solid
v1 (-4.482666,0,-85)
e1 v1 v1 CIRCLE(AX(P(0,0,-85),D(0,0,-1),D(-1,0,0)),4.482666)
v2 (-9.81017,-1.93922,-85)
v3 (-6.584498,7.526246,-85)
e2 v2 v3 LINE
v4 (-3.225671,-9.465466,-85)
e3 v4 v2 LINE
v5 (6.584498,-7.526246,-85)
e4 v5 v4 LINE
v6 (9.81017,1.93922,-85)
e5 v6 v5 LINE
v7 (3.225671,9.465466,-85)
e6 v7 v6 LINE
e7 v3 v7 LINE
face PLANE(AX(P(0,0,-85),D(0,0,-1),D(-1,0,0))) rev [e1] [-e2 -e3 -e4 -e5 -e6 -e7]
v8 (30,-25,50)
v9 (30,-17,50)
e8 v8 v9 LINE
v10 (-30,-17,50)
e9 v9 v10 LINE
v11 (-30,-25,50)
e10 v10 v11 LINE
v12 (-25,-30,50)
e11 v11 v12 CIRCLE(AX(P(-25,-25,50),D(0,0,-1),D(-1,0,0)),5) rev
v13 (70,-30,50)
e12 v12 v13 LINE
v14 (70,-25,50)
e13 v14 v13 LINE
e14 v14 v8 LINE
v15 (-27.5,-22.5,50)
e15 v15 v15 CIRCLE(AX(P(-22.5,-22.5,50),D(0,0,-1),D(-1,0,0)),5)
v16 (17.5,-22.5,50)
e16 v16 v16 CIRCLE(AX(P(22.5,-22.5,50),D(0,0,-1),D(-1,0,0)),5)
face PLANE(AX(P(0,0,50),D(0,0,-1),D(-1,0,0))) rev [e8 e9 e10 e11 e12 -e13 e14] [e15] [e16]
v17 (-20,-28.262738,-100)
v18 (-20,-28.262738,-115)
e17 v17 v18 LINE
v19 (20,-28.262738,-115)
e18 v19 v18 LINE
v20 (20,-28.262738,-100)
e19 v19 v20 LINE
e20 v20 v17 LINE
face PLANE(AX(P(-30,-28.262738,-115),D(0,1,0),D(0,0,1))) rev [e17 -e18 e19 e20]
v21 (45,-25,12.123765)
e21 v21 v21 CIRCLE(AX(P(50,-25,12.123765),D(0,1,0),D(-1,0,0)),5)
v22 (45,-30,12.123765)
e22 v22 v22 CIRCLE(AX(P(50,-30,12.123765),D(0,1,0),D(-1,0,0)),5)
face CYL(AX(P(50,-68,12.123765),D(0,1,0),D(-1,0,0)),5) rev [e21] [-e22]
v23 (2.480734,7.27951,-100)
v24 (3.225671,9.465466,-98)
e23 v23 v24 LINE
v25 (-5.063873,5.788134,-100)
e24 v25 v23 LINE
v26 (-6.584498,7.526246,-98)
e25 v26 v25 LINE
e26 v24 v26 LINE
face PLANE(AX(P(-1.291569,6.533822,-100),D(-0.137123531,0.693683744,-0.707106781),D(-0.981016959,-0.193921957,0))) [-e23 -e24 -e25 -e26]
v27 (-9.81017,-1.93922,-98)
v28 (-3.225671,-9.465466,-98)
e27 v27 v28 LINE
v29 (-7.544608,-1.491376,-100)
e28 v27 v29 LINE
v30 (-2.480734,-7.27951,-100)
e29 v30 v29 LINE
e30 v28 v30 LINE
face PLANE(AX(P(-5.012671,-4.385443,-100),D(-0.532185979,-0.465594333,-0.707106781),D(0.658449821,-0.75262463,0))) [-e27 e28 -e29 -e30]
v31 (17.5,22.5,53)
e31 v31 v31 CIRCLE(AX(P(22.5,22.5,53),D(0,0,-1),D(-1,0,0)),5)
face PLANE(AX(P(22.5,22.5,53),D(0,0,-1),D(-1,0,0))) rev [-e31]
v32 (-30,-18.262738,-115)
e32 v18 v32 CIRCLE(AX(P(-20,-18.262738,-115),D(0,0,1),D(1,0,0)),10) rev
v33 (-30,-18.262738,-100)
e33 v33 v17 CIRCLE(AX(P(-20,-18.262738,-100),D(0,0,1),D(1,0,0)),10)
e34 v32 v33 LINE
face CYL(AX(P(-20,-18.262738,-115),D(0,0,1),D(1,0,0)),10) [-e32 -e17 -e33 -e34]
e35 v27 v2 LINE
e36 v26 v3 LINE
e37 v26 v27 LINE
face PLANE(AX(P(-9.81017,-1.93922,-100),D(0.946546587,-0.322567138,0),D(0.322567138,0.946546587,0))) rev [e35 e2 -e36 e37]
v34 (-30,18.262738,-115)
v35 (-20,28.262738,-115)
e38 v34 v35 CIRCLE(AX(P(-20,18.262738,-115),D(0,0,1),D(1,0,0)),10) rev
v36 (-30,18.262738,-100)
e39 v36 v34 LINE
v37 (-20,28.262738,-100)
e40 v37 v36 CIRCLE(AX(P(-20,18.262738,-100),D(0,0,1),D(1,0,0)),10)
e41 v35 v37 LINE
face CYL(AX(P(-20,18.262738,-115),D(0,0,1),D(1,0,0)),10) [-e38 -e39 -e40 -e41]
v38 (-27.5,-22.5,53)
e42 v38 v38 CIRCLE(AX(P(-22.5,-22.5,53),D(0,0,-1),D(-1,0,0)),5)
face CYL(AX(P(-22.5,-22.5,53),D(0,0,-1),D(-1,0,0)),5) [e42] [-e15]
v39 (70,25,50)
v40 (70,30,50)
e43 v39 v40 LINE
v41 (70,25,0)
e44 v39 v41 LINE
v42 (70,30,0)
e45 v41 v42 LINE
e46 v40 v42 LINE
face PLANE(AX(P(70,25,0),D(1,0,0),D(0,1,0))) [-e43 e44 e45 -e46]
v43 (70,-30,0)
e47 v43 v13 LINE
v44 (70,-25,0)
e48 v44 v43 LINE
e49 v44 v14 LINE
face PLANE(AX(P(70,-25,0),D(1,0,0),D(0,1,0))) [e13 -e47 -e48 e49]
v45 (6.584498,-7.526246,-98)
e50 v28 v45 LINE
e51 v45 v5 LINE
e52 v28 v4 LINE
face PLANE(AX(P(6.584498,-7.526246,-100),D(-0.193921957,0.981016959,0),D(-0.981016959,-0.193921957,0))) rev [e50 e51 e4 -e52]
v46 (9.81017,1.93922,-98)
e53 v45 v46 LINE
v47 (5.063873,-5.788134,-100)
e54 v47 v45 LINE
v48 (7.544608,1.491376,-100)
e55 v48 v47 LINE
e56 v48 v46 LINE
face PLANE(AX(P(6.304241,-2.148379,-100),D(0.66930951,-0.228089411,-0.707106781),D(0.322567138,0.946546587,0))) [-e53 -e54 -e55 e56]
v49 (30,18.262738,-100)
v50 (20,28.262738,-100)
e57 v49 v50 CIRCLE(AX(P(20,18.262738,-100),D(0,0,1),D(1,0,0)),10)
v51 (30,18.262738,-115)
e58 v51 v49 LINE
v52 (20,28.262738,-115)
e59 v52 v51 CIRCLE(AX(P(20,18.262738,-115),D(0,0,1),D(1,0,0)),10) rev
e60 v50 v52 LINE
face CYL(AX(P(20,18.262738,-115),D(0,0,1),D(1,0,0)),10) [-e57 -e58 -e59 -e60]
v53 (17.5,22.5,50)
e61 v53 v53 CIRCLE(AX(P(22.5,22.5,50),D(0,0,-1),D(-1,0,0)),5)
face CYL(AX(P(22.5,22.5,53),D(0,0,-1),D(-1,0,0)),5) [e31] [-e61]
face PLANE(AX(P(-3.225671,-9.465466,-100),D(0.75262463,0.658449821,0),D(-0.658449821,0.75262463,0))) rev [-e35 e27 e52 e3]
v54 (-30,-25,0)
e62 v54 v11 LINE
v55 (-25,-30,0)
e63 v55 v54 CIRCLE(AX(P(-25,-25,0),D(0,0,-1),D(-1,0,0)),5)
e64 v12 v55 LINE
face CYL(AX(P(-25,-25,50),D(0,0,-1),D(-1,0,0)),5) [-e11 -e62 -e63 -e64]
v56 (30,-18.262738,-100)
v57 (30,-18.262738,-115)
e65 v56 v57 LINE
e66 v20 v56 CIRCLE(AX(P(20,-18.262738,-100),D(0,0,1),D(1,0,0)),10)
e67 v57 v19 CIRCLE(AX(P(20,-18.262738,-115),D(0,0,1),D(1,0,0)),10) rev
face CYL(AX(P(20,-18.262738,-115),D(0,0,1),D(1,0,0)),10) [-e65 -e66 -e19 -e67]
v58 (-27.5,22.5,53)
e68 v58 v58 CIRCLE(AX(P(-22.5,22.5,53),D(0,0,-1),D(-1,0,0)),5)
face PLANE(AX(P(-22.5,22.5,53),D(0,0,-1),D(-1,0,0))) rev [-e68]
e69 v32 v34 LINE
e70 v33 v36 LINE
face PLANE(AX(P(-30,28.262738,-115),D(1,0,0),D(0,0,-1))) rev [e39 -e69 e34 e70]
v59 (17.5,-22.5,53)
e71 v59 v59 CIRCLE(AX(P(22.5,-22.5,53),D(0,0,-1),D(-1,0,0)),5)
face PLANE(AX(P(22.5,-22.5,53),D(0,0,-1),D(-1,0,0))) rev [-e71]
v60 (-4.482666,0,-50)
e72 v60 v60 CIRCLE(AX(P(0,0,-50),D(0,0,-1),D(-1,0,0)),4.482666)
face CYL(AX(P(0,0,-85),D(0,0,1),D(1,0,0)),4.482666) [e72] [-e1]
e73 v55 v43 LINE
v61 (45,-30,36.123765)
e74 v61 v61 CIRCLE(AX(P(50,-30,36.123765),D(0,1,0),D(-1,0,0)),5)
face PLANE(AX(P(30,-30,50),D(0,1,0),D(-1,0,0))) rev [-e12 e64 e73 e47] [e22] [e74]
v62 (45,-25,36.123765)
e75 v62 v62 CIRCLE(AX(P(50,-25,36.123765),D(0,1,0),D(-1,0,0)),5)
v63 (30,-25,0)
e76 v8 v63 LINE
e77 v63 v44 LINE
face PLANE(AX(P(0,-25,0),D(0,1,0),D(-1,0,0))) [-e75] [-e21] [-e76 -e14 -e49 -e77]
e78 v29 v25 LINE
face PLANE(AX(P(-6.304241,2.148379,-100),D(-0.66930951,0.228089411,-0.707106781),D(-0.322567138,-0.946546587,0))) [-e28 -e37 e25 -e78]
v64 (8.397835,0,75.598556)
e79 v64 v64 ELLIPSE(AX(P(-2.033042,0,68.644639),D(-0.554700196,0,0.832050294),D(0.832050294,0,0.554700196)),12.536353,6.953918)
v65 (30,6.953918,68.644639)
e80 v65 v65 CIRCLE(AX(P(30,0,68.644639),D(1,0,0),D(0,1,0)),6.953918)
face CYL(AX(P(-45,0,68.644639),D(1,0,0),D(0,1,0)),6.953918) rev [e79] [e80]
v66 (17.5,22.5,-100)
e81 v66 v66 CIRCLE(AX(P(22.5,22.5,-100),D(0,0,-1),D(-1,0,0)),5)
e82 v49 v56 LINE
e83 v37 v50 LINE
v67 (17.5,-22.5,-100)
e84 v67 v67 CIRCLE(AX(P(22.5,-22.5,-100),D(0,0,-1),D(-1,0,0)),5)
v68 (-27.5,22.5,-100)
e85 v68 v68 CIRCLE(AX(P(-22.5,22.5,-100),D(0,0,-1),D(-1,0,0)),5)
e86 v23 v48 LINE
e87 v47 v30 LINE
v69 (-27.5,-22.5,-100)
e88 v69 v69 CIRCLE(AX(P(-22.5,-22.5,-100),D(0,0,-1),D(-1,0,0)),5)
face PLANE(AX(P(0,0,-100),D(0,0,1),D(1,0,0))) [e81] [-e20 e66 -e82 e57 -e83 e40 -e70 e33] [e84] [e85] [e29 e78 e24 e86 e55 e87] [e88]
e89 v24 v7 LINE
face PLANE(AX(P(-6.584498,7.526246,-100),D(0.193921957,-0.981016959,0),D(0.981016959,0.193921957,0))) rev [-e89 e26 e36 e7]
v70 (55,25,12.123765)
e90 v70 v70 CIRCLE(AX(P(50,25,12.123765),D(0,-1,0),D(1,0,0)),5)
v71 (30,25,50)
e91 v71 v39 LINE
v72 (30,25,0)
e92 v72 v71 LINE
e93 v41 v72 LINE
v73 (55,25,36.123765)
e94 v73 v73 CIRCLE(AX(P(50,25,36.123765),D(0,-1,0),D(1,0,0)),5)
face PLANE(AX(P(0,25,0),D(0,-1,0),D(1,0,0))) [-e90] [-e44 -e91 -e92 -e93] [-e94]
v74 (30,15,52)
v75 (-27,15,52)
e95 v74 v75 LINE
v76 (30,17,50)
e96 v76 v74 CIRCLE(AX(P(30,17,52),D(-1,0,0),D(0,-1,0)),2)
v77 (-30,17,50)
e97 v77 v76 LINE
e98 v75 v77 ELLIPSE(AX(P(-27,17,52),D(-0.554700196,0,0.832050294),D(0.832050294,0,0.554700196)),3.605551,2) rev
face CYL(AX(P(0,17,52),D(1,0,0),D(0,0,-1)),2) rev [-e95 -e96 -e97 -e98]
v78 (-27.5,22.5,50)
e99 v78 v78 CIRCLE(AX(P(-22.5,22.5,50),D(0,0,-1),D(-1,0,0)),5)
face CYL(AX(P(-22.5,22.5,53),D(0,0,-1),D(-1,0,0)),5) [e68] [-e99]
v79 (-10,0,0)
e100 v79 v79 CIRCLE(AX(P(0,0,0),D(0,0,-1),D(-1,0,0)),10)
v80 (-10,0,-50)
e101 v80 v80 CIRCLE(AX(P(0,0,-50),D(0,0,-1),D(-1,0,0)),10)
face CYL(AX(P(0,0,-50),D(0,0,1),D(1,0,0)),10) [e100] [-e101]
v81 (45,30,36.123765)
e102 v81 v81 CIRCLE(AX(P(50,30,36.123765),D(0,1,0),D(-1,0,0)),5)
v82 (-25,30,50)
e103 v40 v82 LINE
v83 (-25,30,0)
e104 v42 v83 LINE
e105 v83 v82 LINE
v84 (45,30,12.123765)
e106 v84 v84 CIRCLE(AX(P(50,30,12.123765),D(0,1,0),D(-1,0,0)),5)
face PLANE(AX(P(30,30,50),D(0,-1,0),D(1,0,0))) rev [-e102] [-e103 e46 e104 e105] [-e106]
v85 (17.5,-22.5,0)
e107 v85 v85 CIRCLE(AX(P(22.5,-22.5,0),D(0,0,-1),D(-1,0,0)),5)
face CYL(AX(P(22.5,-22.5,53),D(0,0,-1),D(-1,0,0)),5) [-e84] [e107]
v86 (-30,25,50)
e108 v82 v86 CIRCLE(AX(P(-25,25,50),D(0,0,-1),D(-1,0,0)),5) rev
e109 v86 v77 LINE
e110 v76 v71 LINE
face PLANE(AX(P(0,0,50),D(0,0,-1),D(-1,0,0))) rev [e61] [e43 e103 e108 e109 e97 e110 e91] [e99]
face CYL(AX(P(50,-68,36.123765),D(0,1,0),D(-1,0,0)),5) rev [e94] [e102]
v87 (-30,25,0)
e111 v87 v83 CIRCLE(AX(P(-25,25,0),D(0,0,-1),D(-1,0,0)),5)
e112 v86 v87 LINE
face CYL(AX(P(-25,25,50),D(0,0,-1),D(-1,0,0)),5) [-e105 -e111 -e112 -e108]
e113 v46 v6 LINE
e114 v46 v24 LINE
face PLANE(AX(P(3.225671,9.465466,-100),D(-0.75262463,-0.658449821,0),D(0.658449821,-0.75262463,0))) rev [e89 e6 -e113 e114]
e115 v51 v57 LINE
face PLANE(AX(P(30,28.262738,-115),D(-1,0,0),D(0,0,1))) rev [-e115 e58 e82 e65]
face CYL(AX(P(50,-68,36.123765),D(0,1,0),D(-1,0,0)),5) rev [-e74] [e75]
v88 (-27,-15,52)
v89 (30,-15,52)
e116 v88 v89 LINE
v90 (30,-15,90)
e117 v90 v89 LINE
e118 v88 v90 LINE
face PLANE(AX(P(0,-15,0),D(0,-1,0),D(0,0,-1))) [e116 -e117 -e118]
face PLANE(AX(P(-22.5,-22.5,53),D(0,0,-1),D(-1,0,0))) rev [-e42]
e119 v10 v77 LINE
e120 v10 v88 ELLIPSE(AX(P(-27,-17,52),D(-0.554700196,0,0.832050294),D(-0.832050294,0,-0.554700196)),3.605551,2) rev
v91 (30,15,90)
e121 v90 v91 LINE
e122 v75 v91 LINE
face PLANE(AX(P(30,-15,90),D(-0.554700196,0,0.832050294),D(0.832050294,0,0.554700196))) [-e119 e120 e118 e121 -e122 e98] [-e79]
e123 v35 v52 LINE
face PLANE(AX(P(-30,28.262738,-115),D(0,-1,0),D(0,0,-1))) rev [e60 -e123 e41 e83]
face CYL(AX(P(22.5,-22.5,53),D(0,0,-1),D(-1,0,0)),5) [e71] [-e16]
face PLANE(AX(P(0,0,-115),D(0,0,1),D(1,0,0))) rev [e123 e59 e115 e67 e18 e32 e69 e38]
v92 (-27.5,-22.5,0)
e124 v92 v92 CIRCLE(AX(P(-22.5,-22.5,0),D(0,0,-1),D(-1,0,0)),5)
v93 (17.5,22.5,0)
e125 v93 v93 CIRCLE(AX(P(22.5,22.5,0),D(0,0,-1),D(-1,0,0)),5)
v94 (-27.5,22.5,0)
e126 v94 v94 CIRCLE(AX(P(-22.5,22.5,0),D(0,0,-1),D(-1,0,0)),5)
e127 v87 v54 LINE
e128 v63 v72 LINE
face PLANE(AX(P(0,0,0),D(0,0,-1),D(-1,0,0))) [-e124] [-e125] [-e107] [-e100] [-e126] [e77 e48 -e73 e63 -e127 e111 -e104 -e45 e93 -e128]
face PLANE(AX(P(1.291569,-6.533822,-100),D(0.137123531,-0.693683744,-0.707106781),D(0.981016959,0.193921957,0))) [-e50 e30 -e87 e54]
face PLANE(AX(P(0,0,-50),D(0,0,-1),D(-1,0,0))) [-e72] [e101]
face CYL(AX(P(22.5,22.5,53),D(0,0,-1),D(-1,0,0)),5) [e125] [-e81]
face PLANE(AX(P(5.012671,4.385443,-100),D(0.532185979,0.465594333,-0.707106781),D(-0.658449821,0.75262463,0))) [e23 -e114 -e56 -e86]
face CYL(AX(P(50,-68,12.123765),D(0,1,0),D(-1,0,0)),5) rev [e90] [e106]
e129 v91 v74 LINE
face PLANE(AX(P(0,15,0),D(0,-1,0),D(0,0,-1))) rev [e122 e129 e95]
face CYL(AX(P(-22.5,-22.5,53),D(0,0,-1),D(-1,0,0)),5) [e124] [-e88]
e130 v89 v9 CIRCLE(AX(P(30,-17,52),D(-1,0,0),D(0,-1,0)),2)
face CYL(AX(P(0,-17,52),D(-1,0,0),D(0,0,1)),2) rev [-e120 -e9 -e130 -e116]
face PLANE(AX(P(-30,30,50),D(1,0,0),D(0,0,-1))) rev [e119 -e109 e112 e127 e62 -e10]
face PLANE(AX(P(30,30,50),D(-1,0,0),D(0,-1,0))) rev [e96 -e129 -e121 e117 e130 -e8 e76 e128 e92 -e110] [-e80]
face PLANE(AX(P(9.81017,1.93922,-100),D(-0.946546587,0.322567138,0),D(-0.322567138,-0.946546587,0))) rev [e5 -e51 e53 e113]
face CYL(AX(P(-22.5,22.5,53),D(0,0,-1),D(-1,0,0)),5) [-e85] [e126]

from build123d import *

# Parameters (mm, degrees)
IZIM1_W                          = 60
IZIM1_H                          = 60
Y_KSEKLIK_EKSTR_ZYON1_DEPTH      = 50
IZIM2_R                          = 10
Y_KSEKLIK_EKSTR_ZYON2_DEPTH      = 50
IZIM3_R                          = 4.482666428
Y_KSEKLIK_EKSTR_ZYON3_DEPTH      = 35
Y_KSEKLIK_EKSTR_ZYON4_DEPTH      = 15
PAH1_SIZE                        = 2
Y_KSEKLIK_EKSTR_ZYON7_DEPTH      = 100
Y_KSEKLIK_EKSTR_ZYON7_DEPTH_BACK = 53
IZIM8_R                          = 5
IZIM9_W                          = 60
IZIM9_H                          = 56.52547631
Y_KSEKLIK_EKSTR_ZYON8_DEPTH      = 15
RADYUS2_R                        = 10
Y_KSEKLIK_EKSTR_ZYON9_DEPTH      = 15
Y_KSEKLIK_EKSTR_ZYON9_DEPTH_BACK = 15
IZIM11_R                         = 6.953917593
KES_EKSTR_ZYON1_DEPTH            = 75
RADYUS3_R                        = 5
IZIM12_W                         = 45
IZIM12_H                         = 50
Y_KSEKLIK_EKSTR_ZYON10_DEPTH     = 5
IZIM13_W                         = 45
IZIM13_H                         = 50
Y_KSEKLIK_EKSTR_ZYON11_DEPTH     = 5
IZIM14_R                         = 5
KES_EKSTR_ZYON2_DEPTH            = 98
RADYUS4_R                        = 2


with BuildPart() as part:
    # Çizim1 → Yükseklik-Ekstrüzyon1 (new body)
    with BuildSketch(Plane.XY):
        Rectangle(IZIM1_W, IZIM1_H)
    extrude(amount=Y_KSEKLIK_EKSTR_ZYON1_DEPTH)

    # Çizim2 → Yükseklik-Ekstrüzyon2 (add)
    with BuildSketch(Plane(origin=(0, 0, 0), x_dir=(-1, 0, 0), z_dir=(0, 0, -1))):
        Circle(IZIM2_R)
    extrude(amount=Y_KSEKLIK_EKSTR_ZYON2_DEPTH)

    # Çizim3 → Yükseklik-Ekstrüzyon3 (add)
    with BuildSketch(Plane(origin=(0, 0, -50), x_dir=(-1, 0, 0), z_dir=(0, 0, -1))):
        Circle(IZIM3_R)
    extrude(amount=Y_KSEKLIK_EKSTR_ZYON3_DEPTH)

    # Çizim4 → Yükseklik-Ekstrüzyon4 (add)
    with BuildSketch(Plane(origin=(0, 0, -85), x_dir=(-1, 0, 0), z_dir=(0, 0, -1))):
        Polygon((9.810169594, -1.939219571), (6.584498209, 7.526246298), (-3.225671385, 9.465465869), (-9.810169594, 1.939219571), (-6.584498209, -7.526246298), (3.225671385, -9.465465869), align=None)
    extrude(amount=Y_KSEKLIK_EKSTR_ZYON4_DEPTH)

    # Pah1
    pah1_edges = [part.edges().sort_by_distance(p)[0] for p in [
        (-6.517920489, -5.70234272, -100),
        (-8.197333901, 2.793513364, -100),
        (-1.679413412, 8.495856084, -100),
        (6.517920489, 5.70234272, -100),
        (8.197333901, -2.793513364, -100),
        (1.679413412, -8.495856084, -100),
    ]]
    chamfer(pah1_edges, length=PAH1_SIZE)

    # Çizim8 → Yükseklik-Ekstrüzyon7 (add, two sides: drawn at the far end of the back side and taken through both)
    with BuildSketch(Plane(origin=(0, 0, 0), x_dir=(-1, 0, 0), z_dir=(0, 0, -1)).offset(-Y_KSEKLIK_EKSTR_ZYON7_DEPTH_BACK)):
        with Locations((-22.5, 22.5)):
            Circle(IZIM8_R)
        with Locations((22.5, 22.5)):
            Circle(IZIM8_R)
        with Locations((22.5, -22.5)):
            Circle(IZIM8_R)
        with Locations((-22.5, -22.5)):
            Circle(IZIM8_R)
    extrude(amount=Y_KSEKLIK_EKSTR_ZYON7_DEPTH + Y_KSEKLIK_EKSTR_ZYON7_DEPTH_BACK)

    # Çizim9 → Yükseklik-Ekstrüzyon8 (add)
    with BuildSketch(Plane(origin=(0, 0, -100), x_dir=(-1, 0, 0), z_dir=(0, 0, -1))):
        Rectangle(IZIM9_W, IZIM9_H)
    extrude(amount=Y_KSEKLIK_EKSTR_ZYON8_DEPTH)

    # Radyus2
    radyus2_edges = [part.edges().sort_by_distance(p)[0] for p in [
        (30, 28.262738155, -107.5),
        (30, -28.262738155, -107.5),
        (-30, -28.262738155, -107.5),
        (-30, 28.262738155, -107.5),
    ]]
    fillet(radyus2_edges, radius=RADYUS2_R)

    # Çizim10 → Yükseklik-Ekstrüzyon9 (add, two sides: drawn at the far end of the back side and taken through both)
    with BuildSketch(Plane(origin=(0, 0, 0), x_dir=(1, 0, 0), z_dir=(0, 1, 0)).offset(-Y_KSEKLIK_EKSTR_ZYON9_DEPTH_BACK)):
        Polygon((30, -50), (30, -90), (-30, -50), align=None)
    extrude(amount=Y_KSEKLIK_EKSTR_ZYON9_DEPTH + Y_KSEKLIK_EKSTR_ZYON9_DEPTH_BACK)

    # Çizim11 → Kes-Ekstrüzyon1 (cut)
    with BuildSketch(Plane(origin=(30, 0, 0), x_dir=(0, 0, -1), z_dir=(1, 0, 0))):
        with Locations(Location((-68.644638819, 0, 0), (0, 0, 90))):
            Circle(IZIM11_R)
    extrude(amount=-KES_EKSTR_ZYON1_DEPTH, mode=Mode.SUBTRACT)

    # Radyus3
    radyus3_edges = [part.edges().sort_by_distance(p)[0] for p in [
        (-30, 30, 25),
        (30, 30, 25),
        (30, -30, 25),
        (-30, -30, 25),
    ]]
    fillet(radyus3_edges, radius=RADYUS3_R)

    # Çizim12 → Yükseklik-Ekstrüzyon10 (add)
    with BuildSketch(Plane.XZ.offset(30)):
        with Locations((47.5, 25)):
            Rectangle(IZIM12_W, IZIM12_H)
    extrude(amount=-Y_KSEKLIK_EKSTR_ZYON10_DEPTH)

    # Çizim13 → Yükseklik-Ekstrüzyon11 (add)
    with BuildSketch(Plane(origin=(0, 30, 0), x_dir=(1, 0, 0), z_dir=(0, 1, 0))):
        with Locations((47.5, -25)):
            Rectangle(IZIM13_W, IZIM13_H)
    extrude(amount=-Y_KSEKLIK_EKSTR_ZYON11_DEPTH)

    # Çizim14 → Kes-Ekstrüzyon2 (cut)
    with BuildSketch(Plane(origin=(0, 30, 0), x_dir=(1, 0, 0), z_dir=(0, 1, 0))):
        with Locations(Location((50, -12.123765205, 0), (0, 0, 180))):
            Circle(IZIM14_R)
        with Locations(Location((50, -36.123765205, 0), (0, 0, 180))):
            Circle(IZIM14_R)
    extrude(amount=-KES_EKSTR_ZYON2_DEPTH, mode=Mode.SUBTRACT)

    # Radyus4
    # the kernel refuses this fillet: 2 mm, written as the material it adds along each edge
    with BuildSketch(Plane(origin=(-30, -15, 50), x_dir=(0, -1, 0), z_dir=(1, 0, 0))) as radyus4_piece_1_section:
        with BuildLine():
            CenterArc((RADYUS4_R, -RADYUS4_R), RADYUS4_R, 90, 90)
            Line((0, -RADYUS4_R), (0, 0))
            Line((0, 0), (RADYUS4_R, 0))
        make_face()
    radyus4_piece_1 = extrude(amount=60, mode=Mode.PRIVATE)
    radyus4_piece_1 = split(radyus4_piece_1, bisect_by=Plane(origin=(-8.790437834, -15.455546118, 64.139708111), z_dir=(0.5547001962252291, 0, -0.8320502943378437)), keep=Keep.TOP, mode=Mode.PRIVATE)
    add(radyus4_piece_1)
    with BuildSketch(Plane(origin=(-30, 15, 50), x_dir=(0, 1, 0), z_dir=(1, 0, 0))) as radyus4_piece_2_section:
        with BuildLine():
            CenterArc((RADYUS4_R, RADYUS4_R), RADYUS4_R, 180, 90)
            Line((0, RADYUS4_R), (0, 0))
            Line((0, 0), (RADYUS4_R, 0))
        make_face()
    radyus4_piece_2 = extrude(amount=60, mode=Mode.PRIVATE)
    radyus4_piece_2 = split(radyus4_piece_2, bisect_by=Plane(origin=(-8.790437834, 15.455546118, 64.139708111), z_dir=(0.5547001962252291, 0, -0.8320502943378437)), keep=Keep.TOP, mode=Mode.PRIVATE)
    add(radyus4_piece_2)


solid = part.part
